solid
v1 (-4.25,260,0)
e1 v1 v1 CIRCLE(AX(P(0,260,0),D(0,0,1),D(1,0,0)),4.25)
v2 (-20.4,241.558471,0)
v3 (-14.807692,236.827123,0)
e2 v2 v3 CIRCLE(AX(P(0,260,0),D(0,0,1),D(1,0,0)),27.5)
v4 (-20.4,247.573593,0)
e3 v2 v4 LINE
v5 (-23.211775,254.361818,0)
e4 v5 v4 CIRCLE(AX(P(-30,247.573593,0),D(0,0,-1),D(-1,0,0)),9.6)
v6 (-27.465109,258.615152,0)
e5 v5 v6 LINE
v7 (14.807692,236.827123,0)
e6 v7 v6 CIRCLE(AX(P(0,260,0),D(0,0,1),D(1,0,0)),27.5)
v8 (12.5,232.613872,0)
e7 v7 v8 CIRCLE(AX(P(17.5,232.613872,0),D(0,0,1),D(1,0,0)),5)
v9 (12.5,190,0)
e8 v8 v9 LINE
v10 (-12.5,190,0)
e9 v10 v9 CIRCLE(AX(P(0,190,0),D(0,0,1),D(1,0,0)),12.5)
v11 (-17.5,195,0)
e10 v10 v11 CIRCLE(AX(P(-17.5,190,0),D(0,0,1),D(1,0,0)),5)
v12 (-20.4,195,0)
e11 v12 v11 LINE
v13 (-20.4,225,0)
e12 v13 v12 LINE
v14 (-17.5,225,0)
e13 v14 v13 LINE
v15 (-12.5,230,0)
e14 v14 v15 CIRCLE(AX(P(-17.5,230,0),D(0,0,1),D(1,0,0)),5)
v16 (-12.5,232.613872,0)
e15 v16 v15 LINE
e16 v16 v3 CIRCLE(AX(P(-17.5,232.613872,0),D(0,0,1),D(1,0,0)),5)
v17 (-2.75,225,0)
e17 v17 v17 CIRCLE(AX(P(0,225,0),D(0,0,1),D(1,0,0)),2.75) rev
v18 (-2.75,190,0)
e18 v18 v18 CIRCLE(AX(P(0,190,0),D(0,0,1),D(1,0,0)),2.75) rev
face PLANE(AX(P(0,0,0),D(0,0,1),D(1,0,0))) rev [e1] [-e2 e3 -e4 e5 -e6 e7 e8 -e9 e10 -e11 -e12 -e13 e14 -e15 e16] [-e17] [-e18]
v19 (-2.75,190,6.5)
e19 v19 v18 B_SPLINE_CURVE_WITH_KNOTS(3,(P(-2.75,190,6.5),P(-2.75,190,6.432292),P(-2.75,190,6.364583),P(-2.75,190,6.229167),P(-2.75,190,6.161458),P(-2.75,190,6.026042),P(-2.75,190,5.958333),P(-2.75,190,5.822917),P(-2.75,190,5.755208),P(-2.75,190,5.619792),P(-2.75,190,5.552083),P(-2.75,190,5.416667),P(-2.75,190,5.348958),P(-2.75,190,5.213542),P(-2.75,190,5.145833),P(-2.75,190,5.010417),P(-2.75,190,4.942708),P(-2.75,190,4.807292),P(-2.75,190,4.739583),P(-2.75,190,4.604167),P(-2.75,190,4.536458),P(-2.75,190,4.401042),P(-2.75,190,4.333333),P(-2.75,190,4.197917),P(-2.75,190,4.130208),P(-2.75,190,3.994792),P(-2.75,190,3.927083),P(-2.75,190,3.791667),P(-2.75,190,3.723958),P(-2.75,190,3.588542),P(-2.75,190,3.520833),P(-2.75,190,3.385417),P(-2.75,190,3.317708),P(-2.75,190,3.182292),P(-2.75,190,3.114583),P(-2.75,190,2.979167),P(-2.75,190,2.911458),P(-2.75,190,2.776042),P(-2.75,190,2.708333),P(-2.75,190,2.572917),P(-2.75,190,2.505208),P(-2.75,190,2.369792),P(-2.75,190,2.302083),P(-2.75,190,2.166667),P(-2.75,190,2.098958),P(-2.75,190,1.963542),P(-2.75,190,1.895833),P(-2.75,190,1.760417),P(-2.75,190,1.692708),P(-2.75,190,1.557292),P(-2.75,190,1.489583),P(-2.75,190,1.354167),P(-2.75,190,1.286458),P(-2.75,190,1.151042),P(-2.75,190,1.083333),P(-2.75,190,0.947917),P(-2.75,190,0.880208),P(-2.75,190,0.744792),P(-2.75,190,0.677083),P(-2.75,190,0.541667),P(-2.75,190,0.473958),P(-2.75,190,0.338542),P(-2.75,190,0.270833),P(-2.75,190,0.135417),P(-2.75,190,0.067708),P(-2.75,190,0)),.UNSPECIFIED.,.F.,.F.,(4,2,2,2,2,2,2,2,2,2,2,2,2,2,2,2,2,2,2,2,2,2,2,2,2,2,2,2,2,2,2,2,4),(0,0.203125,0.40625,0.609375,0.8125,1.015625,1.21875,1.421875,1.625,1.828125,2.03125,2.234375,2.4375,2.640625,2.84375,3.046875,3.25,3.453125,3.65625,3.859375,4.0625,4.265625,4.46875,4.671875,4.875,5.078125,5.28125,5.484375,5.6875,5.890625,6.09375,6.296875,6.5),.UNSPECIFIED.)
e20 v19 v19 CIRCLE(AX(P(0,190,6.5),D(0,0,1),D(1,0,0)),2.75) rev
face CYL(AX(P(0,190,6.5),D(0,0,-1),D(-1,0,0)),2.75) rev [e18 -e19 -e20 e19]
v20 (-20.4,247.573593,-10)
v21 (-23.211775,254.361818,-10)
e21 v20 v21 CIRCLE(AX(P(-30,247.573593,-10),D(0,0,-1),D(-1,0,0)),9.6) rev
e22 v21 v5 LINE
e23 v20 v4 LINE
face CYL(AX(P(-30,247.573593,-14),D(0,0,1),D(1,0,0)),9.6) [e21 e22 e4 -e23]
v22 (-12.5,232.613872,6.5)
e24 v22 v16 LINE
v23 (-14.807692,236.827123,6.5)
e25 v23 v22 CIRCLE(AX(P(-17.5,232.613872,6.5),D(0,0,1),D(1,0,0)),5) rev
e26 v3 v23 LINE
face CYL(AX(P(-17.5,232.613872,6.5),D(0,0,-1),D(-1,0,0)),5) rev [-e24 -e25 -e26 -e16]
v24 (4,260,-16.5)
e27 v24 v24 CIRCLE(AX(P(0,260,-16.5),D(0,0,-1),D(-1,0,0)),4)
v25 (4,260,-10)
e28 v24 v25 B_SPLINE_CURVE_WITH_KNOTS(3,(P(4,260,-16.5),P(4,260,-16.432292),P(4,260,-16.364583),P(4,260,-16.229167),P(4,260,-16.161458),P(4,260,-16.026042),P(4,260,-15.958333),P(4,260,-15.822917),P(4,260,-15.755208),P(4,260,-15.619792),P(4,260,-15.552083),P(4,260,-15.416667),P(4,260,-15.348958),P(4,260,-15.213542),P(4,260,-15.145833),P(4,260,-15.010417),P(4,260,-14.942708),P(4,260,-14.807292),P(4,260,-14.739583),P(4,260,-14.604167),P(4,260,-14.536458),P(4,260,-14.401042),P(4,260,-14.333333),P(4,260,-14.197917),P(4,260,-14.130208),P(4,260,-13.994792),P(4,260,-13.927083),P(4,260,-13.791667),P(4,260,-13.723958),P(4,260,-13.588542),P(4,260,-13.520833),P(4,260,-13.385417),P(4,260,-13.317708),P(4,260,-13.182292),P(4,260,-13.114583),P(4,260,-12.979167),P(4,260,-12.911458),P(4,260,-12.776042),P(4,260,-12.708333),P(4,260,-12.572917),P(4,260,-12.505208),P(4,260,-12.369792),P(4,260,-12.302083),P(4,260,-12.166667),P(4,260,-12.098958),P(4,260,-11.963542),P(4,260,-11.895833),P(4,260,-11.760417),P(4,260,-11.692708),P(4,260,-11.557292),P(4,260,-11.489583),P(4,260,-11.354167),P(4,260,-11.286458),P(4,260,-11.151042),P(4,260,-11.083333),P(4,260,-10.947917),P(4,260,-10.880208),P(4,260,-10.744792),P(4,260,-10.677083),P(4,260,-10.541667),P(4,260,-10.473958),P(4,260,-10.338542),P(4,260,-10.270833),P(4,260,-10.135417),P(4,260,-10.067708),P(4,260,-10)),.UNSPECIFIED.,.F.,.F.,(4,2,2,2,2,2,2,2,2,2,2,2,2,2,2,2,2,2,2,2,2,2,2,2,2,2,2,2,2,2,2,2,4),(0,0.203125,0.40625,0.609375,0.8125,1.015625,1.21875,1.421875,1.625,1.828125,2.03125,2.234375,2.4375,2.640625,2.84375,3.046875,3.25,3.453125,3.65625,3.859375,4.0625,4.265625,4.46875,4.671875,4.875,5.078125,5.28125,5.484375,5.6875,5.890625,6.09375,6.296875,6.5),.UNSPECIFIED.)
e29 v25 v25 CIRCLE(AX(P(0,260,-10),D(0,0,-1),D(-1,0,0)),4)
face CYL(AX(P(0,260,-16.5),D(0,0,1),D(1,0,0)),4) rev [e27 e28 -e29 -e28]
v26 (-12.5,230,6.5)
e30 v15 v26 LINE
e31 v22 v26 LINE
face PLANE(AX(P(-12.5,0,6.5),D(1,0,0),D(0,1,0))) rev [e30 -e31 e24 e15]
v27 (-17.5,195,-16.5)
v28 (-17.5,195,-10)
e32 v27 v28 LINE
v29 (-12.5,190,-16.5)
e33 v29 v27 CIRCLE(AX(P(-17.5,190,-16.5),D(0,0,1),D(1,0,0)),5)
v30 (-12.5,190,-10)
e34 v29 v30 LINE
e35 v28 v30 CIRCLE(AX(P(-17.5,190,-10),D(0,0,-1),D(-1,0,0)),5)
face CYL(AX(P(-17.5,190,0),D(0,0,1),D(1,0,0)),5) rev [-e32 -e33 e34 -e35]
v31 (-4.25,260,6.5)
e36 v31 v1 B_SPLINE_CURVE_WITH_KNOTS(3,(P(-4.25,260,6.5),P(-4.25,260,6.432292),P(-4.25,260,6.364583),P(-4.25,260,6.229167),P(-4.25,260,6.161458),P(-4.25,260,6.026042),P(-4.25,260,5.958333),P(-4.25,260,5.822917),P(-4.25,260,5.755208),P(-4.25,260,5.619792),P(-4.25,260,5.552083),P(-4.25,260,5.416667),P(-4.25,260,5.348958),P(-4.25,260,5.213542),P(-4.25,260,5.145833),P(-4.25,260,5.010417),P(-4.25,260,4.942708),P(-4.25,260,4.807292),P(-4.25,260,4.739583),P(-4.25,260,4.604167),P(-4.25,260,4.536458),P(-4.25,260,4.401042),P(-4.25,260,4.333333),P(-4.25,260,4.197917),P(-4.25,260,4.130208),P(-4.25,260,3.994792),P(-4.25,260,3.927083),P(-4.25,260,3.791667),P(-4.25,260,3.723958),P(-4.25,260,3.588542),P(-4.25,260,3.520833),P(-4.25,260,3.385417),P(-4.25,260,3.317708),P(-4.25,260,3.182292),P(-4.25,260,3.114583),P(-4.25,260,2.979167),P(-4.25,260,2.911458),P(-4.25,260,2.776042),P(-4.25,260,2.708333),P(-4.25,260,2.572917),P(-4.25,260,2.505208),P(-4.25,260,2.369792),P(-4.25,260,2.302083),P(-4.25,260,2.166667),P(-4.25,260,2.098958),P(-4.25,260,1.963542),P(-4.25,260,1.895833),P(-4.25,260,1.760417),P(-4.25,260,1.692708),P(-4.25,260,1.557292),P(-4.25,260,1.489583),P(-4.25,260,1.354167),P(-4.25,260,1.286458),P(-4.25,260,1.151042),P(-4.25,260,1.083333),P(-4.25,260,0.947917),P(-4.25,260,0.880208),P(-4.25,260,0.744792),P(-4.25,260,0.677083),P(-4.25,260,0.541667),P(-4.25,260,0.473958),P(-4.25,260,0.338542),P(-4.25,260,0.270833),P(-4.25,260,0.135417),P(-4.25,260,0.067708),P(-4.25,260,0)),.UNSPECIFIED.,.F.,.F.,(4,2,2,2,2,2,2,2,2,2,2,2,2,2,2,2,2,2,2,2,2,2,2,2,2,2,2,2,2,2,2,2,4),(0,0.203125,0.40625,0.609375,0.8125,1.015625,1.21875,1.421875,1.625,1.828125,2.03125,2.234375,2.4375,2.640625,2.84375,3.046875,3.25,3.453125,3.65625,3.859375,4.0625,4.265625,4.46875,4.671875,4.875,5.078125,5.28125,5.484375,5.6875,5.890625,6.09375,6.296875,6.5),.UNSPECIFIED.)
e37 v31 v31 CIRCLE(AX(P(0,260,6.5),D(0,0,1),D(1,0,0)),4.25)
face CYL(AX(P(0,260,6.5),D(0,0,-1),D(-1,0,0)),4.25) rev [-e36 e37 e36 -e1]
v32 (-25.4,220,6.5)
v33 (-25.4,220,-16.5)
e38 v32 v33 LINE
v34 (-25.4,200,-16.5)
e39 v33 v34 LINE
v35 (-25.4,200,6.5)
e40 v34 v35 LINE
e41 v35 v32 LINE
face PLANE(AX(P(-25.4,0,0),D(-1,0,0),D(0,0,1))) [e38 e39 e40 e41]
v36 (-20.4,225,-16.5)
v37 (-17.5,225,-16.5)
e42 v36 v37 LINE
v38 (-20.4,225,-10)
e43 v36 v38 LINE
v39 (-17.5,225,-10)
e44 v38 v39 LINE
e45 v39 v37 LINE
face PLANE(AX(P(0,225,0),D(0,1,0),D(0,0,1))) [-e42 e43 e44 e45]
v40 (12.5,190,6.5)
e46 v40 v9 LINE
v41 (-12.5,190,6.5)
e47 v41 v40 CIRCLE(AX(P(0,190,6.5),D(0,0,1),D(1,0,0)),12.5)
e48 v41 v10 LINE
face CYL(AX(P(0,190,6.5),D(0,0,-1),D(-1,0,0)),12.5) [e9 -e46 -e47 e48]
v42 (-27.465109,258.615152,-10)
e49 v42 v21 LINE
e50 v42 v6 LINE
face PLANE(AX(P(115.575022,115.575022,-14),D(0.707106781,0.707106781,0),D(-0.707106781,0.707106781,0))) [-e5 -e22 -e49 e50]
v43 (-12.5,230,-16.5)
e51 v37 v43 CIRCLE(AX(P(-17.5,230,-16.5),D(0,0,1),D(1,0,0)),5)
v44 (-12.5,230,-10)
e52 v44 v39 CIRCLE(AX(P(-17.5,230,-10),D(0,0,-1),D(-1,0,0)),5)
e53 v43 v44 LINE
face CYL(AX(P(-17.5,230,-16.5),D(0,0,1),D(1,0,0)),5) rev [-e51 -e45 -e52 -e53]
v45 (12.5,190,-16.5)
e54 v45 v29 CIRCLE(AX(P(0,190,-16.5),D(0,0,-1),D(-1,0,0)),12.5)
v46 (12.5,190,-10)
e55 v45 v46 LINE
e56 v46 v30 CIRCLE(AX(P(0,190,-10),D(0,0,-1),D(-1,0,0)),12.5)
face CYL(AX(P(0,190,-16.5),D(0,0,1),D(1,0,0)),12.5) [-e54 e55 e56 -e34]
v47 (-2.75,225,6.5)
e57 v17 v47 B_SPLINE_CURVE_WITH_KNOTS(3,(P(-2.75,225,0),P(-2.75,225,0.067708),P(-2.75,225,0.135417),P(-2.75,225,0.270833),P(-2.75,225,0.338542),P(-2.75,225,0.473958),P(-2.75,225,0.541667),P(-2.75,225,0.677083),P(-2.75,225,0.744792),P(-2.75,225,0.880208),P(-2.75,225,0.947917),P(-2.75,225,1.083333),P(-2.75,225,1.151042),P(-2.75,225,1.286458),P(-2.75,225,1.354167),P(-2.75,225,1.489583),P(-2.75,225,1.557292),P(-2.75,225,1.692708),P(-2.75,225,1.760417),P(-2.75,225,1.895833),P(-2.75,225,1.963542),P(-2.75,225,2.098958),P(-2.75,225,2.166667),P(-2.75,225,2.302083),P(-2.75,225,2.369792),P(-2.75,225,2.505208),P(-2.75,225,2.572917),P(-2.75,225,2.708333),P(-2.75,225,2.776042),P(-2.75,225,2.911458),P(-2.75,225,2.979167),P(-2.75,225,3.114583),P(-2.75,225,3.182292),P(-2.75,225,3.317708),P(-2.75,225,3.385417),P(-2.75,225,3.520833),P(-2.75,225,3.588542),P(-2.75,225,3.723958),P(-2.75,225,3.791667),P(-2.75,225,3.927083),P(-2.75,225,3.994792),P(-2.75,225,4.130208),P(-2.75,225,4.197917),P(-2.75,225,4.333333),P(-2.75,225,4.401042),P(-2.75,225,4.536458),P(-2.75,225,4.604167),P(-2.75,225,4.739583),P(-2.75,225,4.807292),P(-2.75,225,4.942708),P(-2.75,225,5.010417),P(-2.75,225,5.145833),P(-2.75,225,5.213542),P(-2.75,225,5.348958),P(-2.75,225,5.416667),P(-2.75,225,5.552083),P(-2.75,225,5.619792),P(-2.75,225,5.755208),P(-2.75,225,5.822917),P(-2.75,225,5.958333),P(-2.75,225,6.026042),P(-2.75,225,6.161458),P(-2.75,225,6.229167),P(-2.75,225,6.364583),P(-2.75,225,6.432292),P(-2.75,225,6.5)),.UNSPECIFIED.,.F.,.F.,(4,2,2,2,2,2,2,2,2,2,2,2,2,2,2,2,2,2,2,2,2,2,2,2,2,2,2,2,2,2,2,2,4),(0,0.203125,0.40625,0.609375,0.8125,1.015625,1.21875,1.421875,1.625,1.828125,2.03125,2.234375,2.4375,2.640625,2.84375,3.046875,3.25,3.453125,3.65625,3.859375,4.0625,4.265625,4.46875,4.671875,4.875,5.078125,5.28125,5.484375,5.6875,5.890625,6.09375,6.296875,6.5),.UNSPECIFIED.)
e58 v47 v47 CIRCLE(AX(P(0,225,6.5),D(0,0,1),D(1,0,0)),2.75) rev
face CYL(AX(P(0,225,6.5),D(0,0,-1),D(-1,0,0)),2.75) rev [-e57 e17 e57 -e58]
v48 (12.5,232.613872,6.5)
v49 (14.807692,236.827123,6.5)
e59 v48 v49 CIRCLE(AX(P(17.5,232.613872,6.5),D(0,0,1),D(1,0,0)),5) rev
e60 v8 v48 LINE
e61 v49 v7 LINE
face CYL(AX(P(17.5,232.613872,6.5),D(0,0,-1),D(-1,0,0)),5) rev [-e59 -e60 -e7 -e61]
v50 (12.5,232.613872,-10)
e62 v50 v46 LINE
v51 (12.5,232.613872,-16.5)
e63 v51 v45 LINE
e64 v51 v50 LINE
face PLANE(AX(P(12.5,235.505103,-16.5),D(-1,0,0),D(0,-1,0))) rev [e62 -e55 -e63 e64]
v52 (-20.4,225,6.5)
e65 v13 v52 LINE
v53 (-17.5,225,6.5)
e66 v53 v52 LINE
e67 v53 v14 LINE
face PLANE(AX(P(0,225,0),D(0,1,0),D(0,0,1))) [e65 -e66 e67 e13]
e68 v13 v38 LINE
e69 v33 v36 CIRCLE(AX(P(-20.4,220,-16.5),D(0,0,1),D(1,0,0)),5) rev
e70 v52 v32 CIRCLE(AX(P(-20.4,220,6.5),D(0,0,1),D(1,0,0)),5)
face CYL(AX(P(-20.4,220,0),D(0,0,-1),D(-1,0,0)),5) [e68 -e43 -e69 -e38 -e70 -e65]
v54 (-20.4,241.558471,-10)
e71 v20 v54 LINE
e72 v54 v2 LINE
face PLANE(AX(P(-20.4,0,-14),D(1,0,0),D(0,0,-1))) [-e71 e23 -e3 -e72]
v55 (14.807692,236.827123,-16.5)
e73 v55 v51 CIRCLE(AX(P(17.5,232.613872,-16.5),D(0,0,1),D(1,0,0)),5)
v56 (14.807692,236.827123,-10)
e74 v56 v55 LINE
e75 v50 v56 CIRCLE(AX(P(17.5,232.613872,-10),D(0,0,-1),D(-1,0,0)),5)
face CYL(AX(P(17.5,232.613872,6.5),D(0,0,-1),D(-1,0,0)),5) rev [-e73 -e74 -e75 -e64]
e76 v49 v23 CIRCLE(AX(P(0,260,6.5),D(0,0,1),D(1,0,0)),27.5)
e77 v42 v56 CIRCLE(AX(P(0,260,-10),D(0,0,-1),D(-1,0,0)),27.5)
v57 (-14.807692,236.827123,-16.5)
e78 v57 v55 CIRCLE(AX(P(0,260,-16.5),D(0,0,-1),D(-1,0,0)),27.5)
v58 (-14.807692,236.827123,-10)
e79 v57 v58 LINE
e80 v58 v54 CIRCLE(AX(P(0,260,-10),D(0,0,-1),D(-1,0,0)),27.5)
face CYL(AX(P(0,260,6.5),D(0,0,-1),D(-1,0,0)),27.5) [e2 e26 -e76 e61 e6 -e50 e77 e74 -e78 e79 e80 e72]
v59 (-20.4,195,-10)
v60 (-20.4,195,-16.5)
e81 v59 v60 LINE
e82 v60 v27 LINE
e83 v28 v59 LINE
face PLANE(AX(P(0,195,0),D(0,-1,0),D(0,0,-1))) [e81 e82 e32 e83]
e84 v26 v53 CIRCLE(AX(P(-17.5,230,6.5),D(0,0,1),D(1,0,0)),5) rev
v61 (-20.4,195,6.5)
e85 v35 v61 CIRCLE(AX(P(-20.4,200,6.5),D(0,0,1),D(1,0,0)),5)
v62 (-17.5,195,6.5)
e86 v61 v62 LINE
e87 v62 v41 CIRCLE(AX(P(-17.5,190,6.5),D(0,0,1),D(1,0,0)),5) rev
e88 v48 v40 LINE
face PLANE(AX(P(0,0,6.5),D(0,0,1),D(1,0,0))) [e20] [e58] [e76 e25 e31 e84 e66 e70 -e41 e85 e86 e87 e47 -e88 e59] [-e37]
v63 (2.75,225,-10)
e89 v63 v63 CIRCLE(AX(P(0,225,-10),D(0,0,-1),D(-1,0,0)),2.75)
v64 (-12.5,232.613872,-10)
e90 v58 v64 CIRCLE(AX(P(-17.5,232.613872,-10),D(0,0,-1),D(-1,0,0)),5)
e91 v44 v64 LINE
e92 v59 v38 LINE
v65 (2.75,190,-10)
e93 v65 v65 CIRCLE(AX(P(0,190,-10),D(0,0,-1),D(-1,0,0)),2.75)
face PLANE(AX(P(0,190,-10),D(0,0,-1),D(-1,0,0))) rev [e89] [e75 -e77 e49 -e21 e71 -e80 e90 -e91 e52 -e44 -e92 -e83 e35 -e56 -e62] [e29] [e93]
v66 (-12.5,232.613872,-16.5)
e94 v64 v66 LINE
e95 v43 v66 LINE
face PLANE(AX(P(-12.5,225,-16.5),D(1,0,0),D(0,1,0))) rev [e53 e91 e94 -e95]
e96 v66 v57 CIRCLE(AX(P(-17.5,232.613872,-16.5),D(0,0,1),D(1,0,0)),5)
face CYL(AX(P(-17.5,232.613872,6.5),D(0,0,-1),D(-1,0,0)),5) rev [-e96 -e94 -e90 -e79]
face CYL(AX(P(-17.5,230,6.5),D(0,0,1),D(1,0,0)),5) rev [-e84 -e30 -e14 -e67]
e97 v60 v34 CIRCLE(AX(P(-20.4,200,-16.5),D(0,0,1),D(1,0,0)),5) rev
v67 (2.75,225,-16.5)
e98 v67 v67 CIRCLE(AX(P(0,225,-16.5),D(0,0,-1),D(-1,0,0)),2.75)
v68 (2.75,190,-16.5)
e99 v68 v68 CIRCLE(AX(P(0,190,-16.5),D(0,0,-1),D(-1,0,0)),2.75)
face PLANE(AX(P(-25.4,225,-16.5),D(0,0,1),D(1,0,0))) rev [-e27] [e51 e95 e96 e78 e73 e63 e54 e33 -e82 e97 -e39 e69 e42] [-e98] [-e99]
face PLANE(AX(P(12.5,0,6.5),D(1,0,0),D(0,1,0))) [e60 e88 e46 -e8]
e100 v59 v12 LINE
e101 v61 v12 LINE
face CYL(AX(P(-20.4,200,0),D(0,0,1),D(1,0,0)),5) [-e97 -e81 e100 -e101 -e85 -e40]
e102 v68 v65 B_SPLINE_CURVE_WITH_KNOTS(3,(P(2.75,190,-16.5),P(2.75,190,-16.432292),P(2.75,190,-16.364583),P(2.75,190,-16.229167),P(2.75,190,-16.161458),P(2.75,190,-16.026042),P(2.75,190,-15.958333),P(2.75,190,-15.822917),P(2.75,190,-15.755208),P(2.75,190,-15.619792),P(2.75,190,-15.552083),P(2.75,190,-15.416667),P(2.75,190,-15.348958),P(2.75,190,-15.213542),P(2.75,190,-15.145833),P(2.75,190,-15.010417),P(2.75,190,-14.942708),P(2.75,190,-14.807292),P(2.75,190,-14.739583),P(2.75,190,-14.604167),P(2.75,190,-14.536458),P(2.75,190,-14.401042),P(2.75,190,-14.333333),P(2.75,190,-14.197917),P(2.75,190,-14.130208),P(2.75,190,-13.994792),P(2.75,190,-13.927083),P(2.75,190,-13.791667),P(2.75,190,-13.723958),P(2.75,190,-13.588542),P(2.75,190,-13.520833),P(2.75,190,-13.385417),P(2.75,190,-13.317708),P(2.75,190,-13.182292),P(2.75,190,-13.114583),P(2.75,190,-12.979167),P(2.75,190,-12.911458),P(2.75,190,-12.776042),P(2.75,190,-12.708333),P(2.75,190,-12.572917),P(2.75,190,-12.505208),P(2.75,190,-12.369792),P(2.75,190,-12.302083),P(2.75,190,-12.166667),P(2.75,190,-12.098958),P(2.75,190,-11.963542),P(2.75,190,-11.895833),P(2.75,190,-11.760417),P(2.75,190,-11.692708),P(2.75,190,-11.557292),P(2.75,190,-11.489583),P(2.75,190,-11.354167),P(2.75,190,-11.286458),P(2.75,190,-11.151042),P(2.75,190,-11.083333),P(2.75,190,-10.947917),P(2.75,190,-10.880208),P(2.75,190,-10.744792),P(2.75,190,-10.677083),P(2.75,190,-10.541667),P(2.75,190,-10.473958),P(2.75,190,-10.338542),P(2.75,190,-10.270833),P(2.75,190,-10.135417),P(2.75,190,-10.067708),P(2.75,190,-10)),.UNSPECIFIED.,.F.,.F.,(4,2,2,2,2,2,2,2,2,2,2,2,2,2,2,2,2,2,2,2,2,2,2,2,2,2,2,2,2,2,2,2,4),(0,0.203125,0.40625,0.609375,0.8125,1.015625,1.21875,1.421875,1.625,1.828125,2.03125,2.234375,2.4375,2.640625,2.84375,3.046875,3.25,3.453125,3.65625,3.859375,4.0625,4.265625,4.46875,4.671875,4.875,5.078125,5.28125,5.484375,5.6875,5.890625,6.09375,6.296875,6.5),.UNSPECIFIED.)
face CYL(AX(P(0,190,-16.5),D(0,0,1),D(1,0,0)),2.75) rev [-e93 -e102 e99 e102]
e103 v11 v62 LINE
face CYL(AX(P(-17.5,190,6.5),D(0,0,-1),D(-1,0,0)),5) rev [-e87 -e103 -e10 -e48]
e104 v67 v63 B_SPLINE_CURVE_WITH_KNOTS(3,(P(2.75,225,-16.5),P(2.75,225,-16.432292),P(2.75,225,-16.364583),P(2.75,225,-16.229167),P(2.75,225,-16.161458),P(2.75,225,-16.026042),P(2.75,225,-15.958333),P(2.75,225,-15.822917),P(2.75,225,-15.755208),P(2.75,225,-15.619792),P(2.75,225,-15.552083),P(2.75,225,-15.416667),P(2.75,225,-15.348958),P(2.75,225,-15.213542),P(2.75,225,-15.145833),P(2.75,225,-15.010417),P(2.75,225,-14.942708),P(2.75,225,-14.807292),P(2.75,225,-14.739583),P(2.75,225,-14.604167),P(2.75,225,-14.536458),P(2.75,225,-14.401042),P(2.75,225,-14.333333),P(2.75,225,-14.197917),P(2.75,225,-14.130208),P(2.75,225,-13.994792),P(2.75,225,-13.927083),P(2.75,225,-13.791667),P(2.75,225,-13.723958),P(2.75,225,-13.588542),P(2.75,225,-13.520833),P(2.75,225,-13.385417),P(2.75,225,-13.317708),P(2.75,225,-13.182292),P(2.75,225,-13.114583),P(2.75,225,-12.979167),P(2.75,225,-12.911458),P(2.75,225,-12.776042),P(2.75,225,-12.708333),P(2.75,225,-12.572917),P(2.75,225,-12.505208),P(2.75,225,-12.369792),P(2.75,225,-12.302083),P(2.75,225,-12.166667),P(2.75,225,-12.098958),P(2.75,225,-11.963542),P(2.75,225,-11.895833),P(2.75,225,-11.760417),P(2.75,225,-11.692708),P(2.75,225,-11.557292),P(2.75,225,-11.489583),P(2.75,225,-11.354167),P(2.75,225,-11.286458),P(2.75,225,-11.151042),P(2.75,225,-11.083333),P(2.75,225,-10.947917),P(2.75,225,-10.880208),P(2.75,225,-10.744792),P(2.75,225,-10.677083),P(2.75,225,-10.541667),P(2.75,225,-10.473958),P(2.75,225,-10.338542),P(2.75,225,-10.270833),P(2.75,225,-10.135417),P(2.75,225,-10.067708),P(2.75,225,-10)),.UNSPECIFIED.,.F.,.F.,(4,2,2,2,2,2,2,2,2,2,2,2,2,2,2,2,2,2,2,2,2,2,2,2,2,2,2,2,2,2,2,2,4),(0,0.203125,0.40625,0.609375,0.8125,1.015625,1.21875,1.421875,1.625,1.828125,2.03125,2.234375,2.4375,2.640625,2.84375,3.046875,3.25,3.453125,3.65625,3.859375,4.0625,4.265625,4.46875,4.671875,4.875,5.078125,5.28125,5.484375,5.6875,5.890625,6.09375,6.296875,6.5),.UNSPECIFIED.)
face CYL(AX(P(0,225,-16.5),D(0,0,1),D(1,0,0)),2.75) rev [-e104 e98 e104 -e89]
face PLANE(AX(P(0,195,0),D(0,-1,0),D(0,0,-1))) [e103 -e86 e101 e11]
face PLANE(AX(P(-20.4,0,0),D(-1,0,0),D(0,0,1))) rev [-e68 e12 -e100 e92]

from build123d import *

# Parameters (mm, degrees)
SKETCH2_R           = 4.25
SKETCH2_R_2         = 2.75
BOSS_EXTRUDE1_DEPTH = 6.5
SKETCH3_W           = 20
SKETCH3_H           = 30
BOSS_EXTRUDE2_DEPTH = 6.5
SKETCH4_R           = 2.75
CUT_EXTRUDE1_DEPTH  = 289.885357884
SKETCH5_W           = 0.4
SKETCH5_H           = 30
BOSS_EXTRUDE3_DEPTH = 6.5
SKETCH6_R           = 2.75
SKETCH6_R_2         = 4
BOSS_EXTRUDE4_DEPTH = 6.5
SKETCH9_W           = 23
SKETCH9_H           = 30
BOSS_EXTRUDE6_DEPTH = 5
BOSS_EXTRUDE7_DEPTH = 14
FILLET1_START       = -17
FILLET1_DEPTH       = 24
FILLET1_START_2     = -16.5
FILLET1_2_DEPTH     = 6.5
FILLET1_3_DEPTH     = 6.5


with BuildPart() as part:
    # Sketch2 → Boss-Extrude1 (new body)
    with BuildSketch(Plane.XY):
        with BuildLine():
            ThreePointArc((12.5, 235.505102572), (0, 287.5), (-12.5, 235.505102572))
            Line((-12.5, 235.505102572), (-12.5, 190))
            ThreePointArc((-12.5, 190), (0, 177.5), (12.5, 190))
            Line((12.5, 190), (12.5, 235.505102572))
        make_face()
        with Locations(Location((0, 260, 0), (0, 0, 180))):
            Circle(SKETCH2_R, mode=Mode.SUBTRACT)
        with Locations(Location((0, 225, 0), (0, 0, 180))):
            Circle(SKETCH2_R_2, mode=Mode.SUBTRACT)
        with Locations(Location((0, 190, 0), (0, 0, 180))):
            Circle(SKETCH2_R_2, mode=Mode.SUBTRACT)
    extrude(amount=BOSS_EXTRUDE1_DEPTH)

    # Sketch3 → Boss-Extrude2 (add)
    with BuildSketch(Plane.XY.offset(6.5)):
        with Locations((-10, 210)):
            Rectangle(SKETCH3_W, SKETCH3_H)
    extrude(amount=-BOSS_EXTRUDE2_DEPTH)

    # Sketch4 → Cut-Extrude1 (cut, through all)
    with BuildSketch(Plane.XY.offset(6.5)):
        with Locations(Location((0, 225, 0), (0, 0, 180))):
            Circle(SKETCH4_R)
    extrude(amount=-CUT_EXTRUDE1_DEPTH, mode=Mode.SUBTRACT)

    # Sketch5 → Boss-Extrude3 (add)
    with BuildSketch(Plane.XY.offset(6.5)):
        with Locations((-20.2, 210)):
            Rectangle(SKETCH5_W, SKETCH5_H)
    extrude(amount=-BOSS_EXTRUDE3_DEPTH)



with BuildPart() as body_2:
    # Sketch6 → Boss-Extrude4 (new body)
    with BuildSketch(Plane(origin=(0, 0, -10), x_dir=(-1, 0, 0), z_dir=(0, 0, -1))):
        with BuildLine():
            Line((12.5, 190), (12.5, 195))
            Line((12.5, 195), (20.4, 195))
            Line((20.4, 195), (20.4, 225))
            Line((20.4, 225), (12.5, 225))
            Line((12.5, 225), (12.5, 235.505102572))
            ThreePointArc((12.5, 235.505102572), (0, 287.5), (-12.5, 235.505102572))
            Line((-12.5, 235.505102572), (-12.5, 190))
            ThreePointArc((-12.5, 190), (0, 177.5), (12.5, 190))
        make_face()
        with Locations((0, 190)):
            Circle(SKETCH6_R, mode=Mode.SUBTRACT)
        with Locations((0, 225)):
            Circle(SKETCH6_R, mode=Mode.SUBTRACT)
        with Locations(Location((0, 260, 0), (0, 0, 180))):
            Circle(SKETCH6_R_2, mode=Mode.SUBTRACT)
    extrude(amount=BOSS_EXTRUDE4_DEPTH)


with BuildPart() as part_1:
    add(part.part)

    add(body_2.part)  # Boss-Extrude6 merges body 2
    # Sketch9 → Boss-Extrude6 (add)
    with BuildSketch(Plane.ZY.offset(20.4)):
        with Locations((-5, 210)):
            Rectangle(SKETCH9_W, SKETCH9_H)
    extrude(amount=BOSS_EXTRUDE6_DEPTH)

    # Sketch10 → Boss-Extrude7 (add)
    with BuildSketch(Plane(origin=(0, 0, 0), x_dir=(-1, 0, 0), z_dir=(0, 0, -1))):
        with BuildLine():
            ThreePointArc((20.4, 241.558470779), (25.406687144, 249.47620561), (27.465108704, 258.615152031))
            Line((27.465108704, 258.615152031), (23.211774901, 254.361818228))
            ThreePointArc((23.211774901, 254.361818228), (21.130756488, 251.24735408), (20.4, 247.573593129))
            Line((20.4, 247.573593129), (20.4, 241.558470779))
        make_face()
    extrude(amount=BOSS_EXTRUDE7_DEPTH)

    # Fillet1: read off the stored shape, not the designer's step
    # Fillet1 outline → Fillet1 (cut)
    with BuildSketch(Plane.XY.offset(FILLET1_START)):
        with BuildLine():
            ThreePointArc((-20.4, 195), (-23.935533906, 196.464466094), (-25.4, 200))
            Line((-25.4, 200), (-25.4, 195))
            Line((-25.4, 195), (-20.4, 195))
        make_face()
        with BuildLine():
            ThreePointArc((-25.4, 220), (-23.935533906, 223.535533906), (-20.4, 225))
            Line((-20.4, 225), (-25.4, 225))
            Line((-25.4, 225), (-25.4, 220))
        make_face()
    extrude(amount=FILLET1_DEPTH, mode=Mode.SUBTRACT)

    # Fillet1 2 outline → Fillet1 2 (add)
    with BuildSketch(Plane.XY.offset(FILLET1_START_2)):
        with BuildLine():
            Line((12.5, 235.505102572), (12.5, 232.613872125))
            ThreePointArc((12.5, 232.613872125), (13.114709903, 235.015794432), (14.807692308, 236.827122567))
            ThreePointArc((14.807692308, 236.827122567), (13.669837198, 236.138198916), (12.5, 235.505102572))
        make_face()
        with BuildLine():
            Line((-12.5, 195), (-17.5, 195))
            ThreePointArc((-17.5, 195), (-13.964466094, 193.535533906), (-12.5, 190))
            Line((-12.5, 190), (-12.5, 195))
        make_face()
        with BuildLine():
            Line((-12.5, 225), (-12.5, 230))
            ThreePointArc((-12.5, 230), (-13.964466094, 226.464466094), (-17.5, 225))
            Line((-17.5, 225), (-12.5, 225))
        make_face()
        with BuildLine():
            ThreePointArc((-12.5, 235.505102572), (-13.669837198, 236.138198916), (-14.807692308, 236.827122567))
            ThreePointArc((-14.807692308, 236.827122567), (-13.114709903, 235.015794432), (-12.5, 232.613872125))
            Line((-12.5, 232.613872125), (-12.5, 235.505102572))
        make_face()
    extrude(amount=FILLET1_2_DEPTH)

    # Fillet1 3 outline → Fillet1 3 (add)
    with BuildSketch(Plane.XY):
        with BuildLine():
            Line((12.5, 235.505102572), (12.5, 232.613872125))
            ThreePointArc((12.5, 232.613872125), (13.114709903, 235.015794432), (14.807692308, 236.827122567))
            ThreePointArc((14.807692308, 236.827122567), (13.669837198, 236.138198916), (12.5, 235.505102572))
        make_face()
        with BuildLine():
            Line((-12.5, 195), (-17.5, 195))
            ThreePointArc((-17.5, 195), (-13.964466094, 193.535533906), (-12.5, 190))
            Line((-12.5, 190), (-12.5, 195))
        make_face()
        with BuildLine():
            Line((-12.5, 225), (-12.5, 230))
            ThreePointArc((-12.5, 230), (-13.964466094, 226.464466094), (-17.5, 225))
            Line((-17.5, 225), (-12.5, 225))
        make_face()
        with BuildLine():
            ThreePointArc((-12.5, 235.505102572), (-13.669837198, 236.138198916), (-14.807692308, 236.827122567))
            ThreePointArc((-14.807692308, 236.827122567), (-13.114709903, 235.015794432), (-12.5, 232.613872125))
            Line((-12.5, 232.613872125), (-12.5, 235.505102572))
        make_face()
    extrude(amount=FILLET1_3_DEPTH)


solid = part_1.part
